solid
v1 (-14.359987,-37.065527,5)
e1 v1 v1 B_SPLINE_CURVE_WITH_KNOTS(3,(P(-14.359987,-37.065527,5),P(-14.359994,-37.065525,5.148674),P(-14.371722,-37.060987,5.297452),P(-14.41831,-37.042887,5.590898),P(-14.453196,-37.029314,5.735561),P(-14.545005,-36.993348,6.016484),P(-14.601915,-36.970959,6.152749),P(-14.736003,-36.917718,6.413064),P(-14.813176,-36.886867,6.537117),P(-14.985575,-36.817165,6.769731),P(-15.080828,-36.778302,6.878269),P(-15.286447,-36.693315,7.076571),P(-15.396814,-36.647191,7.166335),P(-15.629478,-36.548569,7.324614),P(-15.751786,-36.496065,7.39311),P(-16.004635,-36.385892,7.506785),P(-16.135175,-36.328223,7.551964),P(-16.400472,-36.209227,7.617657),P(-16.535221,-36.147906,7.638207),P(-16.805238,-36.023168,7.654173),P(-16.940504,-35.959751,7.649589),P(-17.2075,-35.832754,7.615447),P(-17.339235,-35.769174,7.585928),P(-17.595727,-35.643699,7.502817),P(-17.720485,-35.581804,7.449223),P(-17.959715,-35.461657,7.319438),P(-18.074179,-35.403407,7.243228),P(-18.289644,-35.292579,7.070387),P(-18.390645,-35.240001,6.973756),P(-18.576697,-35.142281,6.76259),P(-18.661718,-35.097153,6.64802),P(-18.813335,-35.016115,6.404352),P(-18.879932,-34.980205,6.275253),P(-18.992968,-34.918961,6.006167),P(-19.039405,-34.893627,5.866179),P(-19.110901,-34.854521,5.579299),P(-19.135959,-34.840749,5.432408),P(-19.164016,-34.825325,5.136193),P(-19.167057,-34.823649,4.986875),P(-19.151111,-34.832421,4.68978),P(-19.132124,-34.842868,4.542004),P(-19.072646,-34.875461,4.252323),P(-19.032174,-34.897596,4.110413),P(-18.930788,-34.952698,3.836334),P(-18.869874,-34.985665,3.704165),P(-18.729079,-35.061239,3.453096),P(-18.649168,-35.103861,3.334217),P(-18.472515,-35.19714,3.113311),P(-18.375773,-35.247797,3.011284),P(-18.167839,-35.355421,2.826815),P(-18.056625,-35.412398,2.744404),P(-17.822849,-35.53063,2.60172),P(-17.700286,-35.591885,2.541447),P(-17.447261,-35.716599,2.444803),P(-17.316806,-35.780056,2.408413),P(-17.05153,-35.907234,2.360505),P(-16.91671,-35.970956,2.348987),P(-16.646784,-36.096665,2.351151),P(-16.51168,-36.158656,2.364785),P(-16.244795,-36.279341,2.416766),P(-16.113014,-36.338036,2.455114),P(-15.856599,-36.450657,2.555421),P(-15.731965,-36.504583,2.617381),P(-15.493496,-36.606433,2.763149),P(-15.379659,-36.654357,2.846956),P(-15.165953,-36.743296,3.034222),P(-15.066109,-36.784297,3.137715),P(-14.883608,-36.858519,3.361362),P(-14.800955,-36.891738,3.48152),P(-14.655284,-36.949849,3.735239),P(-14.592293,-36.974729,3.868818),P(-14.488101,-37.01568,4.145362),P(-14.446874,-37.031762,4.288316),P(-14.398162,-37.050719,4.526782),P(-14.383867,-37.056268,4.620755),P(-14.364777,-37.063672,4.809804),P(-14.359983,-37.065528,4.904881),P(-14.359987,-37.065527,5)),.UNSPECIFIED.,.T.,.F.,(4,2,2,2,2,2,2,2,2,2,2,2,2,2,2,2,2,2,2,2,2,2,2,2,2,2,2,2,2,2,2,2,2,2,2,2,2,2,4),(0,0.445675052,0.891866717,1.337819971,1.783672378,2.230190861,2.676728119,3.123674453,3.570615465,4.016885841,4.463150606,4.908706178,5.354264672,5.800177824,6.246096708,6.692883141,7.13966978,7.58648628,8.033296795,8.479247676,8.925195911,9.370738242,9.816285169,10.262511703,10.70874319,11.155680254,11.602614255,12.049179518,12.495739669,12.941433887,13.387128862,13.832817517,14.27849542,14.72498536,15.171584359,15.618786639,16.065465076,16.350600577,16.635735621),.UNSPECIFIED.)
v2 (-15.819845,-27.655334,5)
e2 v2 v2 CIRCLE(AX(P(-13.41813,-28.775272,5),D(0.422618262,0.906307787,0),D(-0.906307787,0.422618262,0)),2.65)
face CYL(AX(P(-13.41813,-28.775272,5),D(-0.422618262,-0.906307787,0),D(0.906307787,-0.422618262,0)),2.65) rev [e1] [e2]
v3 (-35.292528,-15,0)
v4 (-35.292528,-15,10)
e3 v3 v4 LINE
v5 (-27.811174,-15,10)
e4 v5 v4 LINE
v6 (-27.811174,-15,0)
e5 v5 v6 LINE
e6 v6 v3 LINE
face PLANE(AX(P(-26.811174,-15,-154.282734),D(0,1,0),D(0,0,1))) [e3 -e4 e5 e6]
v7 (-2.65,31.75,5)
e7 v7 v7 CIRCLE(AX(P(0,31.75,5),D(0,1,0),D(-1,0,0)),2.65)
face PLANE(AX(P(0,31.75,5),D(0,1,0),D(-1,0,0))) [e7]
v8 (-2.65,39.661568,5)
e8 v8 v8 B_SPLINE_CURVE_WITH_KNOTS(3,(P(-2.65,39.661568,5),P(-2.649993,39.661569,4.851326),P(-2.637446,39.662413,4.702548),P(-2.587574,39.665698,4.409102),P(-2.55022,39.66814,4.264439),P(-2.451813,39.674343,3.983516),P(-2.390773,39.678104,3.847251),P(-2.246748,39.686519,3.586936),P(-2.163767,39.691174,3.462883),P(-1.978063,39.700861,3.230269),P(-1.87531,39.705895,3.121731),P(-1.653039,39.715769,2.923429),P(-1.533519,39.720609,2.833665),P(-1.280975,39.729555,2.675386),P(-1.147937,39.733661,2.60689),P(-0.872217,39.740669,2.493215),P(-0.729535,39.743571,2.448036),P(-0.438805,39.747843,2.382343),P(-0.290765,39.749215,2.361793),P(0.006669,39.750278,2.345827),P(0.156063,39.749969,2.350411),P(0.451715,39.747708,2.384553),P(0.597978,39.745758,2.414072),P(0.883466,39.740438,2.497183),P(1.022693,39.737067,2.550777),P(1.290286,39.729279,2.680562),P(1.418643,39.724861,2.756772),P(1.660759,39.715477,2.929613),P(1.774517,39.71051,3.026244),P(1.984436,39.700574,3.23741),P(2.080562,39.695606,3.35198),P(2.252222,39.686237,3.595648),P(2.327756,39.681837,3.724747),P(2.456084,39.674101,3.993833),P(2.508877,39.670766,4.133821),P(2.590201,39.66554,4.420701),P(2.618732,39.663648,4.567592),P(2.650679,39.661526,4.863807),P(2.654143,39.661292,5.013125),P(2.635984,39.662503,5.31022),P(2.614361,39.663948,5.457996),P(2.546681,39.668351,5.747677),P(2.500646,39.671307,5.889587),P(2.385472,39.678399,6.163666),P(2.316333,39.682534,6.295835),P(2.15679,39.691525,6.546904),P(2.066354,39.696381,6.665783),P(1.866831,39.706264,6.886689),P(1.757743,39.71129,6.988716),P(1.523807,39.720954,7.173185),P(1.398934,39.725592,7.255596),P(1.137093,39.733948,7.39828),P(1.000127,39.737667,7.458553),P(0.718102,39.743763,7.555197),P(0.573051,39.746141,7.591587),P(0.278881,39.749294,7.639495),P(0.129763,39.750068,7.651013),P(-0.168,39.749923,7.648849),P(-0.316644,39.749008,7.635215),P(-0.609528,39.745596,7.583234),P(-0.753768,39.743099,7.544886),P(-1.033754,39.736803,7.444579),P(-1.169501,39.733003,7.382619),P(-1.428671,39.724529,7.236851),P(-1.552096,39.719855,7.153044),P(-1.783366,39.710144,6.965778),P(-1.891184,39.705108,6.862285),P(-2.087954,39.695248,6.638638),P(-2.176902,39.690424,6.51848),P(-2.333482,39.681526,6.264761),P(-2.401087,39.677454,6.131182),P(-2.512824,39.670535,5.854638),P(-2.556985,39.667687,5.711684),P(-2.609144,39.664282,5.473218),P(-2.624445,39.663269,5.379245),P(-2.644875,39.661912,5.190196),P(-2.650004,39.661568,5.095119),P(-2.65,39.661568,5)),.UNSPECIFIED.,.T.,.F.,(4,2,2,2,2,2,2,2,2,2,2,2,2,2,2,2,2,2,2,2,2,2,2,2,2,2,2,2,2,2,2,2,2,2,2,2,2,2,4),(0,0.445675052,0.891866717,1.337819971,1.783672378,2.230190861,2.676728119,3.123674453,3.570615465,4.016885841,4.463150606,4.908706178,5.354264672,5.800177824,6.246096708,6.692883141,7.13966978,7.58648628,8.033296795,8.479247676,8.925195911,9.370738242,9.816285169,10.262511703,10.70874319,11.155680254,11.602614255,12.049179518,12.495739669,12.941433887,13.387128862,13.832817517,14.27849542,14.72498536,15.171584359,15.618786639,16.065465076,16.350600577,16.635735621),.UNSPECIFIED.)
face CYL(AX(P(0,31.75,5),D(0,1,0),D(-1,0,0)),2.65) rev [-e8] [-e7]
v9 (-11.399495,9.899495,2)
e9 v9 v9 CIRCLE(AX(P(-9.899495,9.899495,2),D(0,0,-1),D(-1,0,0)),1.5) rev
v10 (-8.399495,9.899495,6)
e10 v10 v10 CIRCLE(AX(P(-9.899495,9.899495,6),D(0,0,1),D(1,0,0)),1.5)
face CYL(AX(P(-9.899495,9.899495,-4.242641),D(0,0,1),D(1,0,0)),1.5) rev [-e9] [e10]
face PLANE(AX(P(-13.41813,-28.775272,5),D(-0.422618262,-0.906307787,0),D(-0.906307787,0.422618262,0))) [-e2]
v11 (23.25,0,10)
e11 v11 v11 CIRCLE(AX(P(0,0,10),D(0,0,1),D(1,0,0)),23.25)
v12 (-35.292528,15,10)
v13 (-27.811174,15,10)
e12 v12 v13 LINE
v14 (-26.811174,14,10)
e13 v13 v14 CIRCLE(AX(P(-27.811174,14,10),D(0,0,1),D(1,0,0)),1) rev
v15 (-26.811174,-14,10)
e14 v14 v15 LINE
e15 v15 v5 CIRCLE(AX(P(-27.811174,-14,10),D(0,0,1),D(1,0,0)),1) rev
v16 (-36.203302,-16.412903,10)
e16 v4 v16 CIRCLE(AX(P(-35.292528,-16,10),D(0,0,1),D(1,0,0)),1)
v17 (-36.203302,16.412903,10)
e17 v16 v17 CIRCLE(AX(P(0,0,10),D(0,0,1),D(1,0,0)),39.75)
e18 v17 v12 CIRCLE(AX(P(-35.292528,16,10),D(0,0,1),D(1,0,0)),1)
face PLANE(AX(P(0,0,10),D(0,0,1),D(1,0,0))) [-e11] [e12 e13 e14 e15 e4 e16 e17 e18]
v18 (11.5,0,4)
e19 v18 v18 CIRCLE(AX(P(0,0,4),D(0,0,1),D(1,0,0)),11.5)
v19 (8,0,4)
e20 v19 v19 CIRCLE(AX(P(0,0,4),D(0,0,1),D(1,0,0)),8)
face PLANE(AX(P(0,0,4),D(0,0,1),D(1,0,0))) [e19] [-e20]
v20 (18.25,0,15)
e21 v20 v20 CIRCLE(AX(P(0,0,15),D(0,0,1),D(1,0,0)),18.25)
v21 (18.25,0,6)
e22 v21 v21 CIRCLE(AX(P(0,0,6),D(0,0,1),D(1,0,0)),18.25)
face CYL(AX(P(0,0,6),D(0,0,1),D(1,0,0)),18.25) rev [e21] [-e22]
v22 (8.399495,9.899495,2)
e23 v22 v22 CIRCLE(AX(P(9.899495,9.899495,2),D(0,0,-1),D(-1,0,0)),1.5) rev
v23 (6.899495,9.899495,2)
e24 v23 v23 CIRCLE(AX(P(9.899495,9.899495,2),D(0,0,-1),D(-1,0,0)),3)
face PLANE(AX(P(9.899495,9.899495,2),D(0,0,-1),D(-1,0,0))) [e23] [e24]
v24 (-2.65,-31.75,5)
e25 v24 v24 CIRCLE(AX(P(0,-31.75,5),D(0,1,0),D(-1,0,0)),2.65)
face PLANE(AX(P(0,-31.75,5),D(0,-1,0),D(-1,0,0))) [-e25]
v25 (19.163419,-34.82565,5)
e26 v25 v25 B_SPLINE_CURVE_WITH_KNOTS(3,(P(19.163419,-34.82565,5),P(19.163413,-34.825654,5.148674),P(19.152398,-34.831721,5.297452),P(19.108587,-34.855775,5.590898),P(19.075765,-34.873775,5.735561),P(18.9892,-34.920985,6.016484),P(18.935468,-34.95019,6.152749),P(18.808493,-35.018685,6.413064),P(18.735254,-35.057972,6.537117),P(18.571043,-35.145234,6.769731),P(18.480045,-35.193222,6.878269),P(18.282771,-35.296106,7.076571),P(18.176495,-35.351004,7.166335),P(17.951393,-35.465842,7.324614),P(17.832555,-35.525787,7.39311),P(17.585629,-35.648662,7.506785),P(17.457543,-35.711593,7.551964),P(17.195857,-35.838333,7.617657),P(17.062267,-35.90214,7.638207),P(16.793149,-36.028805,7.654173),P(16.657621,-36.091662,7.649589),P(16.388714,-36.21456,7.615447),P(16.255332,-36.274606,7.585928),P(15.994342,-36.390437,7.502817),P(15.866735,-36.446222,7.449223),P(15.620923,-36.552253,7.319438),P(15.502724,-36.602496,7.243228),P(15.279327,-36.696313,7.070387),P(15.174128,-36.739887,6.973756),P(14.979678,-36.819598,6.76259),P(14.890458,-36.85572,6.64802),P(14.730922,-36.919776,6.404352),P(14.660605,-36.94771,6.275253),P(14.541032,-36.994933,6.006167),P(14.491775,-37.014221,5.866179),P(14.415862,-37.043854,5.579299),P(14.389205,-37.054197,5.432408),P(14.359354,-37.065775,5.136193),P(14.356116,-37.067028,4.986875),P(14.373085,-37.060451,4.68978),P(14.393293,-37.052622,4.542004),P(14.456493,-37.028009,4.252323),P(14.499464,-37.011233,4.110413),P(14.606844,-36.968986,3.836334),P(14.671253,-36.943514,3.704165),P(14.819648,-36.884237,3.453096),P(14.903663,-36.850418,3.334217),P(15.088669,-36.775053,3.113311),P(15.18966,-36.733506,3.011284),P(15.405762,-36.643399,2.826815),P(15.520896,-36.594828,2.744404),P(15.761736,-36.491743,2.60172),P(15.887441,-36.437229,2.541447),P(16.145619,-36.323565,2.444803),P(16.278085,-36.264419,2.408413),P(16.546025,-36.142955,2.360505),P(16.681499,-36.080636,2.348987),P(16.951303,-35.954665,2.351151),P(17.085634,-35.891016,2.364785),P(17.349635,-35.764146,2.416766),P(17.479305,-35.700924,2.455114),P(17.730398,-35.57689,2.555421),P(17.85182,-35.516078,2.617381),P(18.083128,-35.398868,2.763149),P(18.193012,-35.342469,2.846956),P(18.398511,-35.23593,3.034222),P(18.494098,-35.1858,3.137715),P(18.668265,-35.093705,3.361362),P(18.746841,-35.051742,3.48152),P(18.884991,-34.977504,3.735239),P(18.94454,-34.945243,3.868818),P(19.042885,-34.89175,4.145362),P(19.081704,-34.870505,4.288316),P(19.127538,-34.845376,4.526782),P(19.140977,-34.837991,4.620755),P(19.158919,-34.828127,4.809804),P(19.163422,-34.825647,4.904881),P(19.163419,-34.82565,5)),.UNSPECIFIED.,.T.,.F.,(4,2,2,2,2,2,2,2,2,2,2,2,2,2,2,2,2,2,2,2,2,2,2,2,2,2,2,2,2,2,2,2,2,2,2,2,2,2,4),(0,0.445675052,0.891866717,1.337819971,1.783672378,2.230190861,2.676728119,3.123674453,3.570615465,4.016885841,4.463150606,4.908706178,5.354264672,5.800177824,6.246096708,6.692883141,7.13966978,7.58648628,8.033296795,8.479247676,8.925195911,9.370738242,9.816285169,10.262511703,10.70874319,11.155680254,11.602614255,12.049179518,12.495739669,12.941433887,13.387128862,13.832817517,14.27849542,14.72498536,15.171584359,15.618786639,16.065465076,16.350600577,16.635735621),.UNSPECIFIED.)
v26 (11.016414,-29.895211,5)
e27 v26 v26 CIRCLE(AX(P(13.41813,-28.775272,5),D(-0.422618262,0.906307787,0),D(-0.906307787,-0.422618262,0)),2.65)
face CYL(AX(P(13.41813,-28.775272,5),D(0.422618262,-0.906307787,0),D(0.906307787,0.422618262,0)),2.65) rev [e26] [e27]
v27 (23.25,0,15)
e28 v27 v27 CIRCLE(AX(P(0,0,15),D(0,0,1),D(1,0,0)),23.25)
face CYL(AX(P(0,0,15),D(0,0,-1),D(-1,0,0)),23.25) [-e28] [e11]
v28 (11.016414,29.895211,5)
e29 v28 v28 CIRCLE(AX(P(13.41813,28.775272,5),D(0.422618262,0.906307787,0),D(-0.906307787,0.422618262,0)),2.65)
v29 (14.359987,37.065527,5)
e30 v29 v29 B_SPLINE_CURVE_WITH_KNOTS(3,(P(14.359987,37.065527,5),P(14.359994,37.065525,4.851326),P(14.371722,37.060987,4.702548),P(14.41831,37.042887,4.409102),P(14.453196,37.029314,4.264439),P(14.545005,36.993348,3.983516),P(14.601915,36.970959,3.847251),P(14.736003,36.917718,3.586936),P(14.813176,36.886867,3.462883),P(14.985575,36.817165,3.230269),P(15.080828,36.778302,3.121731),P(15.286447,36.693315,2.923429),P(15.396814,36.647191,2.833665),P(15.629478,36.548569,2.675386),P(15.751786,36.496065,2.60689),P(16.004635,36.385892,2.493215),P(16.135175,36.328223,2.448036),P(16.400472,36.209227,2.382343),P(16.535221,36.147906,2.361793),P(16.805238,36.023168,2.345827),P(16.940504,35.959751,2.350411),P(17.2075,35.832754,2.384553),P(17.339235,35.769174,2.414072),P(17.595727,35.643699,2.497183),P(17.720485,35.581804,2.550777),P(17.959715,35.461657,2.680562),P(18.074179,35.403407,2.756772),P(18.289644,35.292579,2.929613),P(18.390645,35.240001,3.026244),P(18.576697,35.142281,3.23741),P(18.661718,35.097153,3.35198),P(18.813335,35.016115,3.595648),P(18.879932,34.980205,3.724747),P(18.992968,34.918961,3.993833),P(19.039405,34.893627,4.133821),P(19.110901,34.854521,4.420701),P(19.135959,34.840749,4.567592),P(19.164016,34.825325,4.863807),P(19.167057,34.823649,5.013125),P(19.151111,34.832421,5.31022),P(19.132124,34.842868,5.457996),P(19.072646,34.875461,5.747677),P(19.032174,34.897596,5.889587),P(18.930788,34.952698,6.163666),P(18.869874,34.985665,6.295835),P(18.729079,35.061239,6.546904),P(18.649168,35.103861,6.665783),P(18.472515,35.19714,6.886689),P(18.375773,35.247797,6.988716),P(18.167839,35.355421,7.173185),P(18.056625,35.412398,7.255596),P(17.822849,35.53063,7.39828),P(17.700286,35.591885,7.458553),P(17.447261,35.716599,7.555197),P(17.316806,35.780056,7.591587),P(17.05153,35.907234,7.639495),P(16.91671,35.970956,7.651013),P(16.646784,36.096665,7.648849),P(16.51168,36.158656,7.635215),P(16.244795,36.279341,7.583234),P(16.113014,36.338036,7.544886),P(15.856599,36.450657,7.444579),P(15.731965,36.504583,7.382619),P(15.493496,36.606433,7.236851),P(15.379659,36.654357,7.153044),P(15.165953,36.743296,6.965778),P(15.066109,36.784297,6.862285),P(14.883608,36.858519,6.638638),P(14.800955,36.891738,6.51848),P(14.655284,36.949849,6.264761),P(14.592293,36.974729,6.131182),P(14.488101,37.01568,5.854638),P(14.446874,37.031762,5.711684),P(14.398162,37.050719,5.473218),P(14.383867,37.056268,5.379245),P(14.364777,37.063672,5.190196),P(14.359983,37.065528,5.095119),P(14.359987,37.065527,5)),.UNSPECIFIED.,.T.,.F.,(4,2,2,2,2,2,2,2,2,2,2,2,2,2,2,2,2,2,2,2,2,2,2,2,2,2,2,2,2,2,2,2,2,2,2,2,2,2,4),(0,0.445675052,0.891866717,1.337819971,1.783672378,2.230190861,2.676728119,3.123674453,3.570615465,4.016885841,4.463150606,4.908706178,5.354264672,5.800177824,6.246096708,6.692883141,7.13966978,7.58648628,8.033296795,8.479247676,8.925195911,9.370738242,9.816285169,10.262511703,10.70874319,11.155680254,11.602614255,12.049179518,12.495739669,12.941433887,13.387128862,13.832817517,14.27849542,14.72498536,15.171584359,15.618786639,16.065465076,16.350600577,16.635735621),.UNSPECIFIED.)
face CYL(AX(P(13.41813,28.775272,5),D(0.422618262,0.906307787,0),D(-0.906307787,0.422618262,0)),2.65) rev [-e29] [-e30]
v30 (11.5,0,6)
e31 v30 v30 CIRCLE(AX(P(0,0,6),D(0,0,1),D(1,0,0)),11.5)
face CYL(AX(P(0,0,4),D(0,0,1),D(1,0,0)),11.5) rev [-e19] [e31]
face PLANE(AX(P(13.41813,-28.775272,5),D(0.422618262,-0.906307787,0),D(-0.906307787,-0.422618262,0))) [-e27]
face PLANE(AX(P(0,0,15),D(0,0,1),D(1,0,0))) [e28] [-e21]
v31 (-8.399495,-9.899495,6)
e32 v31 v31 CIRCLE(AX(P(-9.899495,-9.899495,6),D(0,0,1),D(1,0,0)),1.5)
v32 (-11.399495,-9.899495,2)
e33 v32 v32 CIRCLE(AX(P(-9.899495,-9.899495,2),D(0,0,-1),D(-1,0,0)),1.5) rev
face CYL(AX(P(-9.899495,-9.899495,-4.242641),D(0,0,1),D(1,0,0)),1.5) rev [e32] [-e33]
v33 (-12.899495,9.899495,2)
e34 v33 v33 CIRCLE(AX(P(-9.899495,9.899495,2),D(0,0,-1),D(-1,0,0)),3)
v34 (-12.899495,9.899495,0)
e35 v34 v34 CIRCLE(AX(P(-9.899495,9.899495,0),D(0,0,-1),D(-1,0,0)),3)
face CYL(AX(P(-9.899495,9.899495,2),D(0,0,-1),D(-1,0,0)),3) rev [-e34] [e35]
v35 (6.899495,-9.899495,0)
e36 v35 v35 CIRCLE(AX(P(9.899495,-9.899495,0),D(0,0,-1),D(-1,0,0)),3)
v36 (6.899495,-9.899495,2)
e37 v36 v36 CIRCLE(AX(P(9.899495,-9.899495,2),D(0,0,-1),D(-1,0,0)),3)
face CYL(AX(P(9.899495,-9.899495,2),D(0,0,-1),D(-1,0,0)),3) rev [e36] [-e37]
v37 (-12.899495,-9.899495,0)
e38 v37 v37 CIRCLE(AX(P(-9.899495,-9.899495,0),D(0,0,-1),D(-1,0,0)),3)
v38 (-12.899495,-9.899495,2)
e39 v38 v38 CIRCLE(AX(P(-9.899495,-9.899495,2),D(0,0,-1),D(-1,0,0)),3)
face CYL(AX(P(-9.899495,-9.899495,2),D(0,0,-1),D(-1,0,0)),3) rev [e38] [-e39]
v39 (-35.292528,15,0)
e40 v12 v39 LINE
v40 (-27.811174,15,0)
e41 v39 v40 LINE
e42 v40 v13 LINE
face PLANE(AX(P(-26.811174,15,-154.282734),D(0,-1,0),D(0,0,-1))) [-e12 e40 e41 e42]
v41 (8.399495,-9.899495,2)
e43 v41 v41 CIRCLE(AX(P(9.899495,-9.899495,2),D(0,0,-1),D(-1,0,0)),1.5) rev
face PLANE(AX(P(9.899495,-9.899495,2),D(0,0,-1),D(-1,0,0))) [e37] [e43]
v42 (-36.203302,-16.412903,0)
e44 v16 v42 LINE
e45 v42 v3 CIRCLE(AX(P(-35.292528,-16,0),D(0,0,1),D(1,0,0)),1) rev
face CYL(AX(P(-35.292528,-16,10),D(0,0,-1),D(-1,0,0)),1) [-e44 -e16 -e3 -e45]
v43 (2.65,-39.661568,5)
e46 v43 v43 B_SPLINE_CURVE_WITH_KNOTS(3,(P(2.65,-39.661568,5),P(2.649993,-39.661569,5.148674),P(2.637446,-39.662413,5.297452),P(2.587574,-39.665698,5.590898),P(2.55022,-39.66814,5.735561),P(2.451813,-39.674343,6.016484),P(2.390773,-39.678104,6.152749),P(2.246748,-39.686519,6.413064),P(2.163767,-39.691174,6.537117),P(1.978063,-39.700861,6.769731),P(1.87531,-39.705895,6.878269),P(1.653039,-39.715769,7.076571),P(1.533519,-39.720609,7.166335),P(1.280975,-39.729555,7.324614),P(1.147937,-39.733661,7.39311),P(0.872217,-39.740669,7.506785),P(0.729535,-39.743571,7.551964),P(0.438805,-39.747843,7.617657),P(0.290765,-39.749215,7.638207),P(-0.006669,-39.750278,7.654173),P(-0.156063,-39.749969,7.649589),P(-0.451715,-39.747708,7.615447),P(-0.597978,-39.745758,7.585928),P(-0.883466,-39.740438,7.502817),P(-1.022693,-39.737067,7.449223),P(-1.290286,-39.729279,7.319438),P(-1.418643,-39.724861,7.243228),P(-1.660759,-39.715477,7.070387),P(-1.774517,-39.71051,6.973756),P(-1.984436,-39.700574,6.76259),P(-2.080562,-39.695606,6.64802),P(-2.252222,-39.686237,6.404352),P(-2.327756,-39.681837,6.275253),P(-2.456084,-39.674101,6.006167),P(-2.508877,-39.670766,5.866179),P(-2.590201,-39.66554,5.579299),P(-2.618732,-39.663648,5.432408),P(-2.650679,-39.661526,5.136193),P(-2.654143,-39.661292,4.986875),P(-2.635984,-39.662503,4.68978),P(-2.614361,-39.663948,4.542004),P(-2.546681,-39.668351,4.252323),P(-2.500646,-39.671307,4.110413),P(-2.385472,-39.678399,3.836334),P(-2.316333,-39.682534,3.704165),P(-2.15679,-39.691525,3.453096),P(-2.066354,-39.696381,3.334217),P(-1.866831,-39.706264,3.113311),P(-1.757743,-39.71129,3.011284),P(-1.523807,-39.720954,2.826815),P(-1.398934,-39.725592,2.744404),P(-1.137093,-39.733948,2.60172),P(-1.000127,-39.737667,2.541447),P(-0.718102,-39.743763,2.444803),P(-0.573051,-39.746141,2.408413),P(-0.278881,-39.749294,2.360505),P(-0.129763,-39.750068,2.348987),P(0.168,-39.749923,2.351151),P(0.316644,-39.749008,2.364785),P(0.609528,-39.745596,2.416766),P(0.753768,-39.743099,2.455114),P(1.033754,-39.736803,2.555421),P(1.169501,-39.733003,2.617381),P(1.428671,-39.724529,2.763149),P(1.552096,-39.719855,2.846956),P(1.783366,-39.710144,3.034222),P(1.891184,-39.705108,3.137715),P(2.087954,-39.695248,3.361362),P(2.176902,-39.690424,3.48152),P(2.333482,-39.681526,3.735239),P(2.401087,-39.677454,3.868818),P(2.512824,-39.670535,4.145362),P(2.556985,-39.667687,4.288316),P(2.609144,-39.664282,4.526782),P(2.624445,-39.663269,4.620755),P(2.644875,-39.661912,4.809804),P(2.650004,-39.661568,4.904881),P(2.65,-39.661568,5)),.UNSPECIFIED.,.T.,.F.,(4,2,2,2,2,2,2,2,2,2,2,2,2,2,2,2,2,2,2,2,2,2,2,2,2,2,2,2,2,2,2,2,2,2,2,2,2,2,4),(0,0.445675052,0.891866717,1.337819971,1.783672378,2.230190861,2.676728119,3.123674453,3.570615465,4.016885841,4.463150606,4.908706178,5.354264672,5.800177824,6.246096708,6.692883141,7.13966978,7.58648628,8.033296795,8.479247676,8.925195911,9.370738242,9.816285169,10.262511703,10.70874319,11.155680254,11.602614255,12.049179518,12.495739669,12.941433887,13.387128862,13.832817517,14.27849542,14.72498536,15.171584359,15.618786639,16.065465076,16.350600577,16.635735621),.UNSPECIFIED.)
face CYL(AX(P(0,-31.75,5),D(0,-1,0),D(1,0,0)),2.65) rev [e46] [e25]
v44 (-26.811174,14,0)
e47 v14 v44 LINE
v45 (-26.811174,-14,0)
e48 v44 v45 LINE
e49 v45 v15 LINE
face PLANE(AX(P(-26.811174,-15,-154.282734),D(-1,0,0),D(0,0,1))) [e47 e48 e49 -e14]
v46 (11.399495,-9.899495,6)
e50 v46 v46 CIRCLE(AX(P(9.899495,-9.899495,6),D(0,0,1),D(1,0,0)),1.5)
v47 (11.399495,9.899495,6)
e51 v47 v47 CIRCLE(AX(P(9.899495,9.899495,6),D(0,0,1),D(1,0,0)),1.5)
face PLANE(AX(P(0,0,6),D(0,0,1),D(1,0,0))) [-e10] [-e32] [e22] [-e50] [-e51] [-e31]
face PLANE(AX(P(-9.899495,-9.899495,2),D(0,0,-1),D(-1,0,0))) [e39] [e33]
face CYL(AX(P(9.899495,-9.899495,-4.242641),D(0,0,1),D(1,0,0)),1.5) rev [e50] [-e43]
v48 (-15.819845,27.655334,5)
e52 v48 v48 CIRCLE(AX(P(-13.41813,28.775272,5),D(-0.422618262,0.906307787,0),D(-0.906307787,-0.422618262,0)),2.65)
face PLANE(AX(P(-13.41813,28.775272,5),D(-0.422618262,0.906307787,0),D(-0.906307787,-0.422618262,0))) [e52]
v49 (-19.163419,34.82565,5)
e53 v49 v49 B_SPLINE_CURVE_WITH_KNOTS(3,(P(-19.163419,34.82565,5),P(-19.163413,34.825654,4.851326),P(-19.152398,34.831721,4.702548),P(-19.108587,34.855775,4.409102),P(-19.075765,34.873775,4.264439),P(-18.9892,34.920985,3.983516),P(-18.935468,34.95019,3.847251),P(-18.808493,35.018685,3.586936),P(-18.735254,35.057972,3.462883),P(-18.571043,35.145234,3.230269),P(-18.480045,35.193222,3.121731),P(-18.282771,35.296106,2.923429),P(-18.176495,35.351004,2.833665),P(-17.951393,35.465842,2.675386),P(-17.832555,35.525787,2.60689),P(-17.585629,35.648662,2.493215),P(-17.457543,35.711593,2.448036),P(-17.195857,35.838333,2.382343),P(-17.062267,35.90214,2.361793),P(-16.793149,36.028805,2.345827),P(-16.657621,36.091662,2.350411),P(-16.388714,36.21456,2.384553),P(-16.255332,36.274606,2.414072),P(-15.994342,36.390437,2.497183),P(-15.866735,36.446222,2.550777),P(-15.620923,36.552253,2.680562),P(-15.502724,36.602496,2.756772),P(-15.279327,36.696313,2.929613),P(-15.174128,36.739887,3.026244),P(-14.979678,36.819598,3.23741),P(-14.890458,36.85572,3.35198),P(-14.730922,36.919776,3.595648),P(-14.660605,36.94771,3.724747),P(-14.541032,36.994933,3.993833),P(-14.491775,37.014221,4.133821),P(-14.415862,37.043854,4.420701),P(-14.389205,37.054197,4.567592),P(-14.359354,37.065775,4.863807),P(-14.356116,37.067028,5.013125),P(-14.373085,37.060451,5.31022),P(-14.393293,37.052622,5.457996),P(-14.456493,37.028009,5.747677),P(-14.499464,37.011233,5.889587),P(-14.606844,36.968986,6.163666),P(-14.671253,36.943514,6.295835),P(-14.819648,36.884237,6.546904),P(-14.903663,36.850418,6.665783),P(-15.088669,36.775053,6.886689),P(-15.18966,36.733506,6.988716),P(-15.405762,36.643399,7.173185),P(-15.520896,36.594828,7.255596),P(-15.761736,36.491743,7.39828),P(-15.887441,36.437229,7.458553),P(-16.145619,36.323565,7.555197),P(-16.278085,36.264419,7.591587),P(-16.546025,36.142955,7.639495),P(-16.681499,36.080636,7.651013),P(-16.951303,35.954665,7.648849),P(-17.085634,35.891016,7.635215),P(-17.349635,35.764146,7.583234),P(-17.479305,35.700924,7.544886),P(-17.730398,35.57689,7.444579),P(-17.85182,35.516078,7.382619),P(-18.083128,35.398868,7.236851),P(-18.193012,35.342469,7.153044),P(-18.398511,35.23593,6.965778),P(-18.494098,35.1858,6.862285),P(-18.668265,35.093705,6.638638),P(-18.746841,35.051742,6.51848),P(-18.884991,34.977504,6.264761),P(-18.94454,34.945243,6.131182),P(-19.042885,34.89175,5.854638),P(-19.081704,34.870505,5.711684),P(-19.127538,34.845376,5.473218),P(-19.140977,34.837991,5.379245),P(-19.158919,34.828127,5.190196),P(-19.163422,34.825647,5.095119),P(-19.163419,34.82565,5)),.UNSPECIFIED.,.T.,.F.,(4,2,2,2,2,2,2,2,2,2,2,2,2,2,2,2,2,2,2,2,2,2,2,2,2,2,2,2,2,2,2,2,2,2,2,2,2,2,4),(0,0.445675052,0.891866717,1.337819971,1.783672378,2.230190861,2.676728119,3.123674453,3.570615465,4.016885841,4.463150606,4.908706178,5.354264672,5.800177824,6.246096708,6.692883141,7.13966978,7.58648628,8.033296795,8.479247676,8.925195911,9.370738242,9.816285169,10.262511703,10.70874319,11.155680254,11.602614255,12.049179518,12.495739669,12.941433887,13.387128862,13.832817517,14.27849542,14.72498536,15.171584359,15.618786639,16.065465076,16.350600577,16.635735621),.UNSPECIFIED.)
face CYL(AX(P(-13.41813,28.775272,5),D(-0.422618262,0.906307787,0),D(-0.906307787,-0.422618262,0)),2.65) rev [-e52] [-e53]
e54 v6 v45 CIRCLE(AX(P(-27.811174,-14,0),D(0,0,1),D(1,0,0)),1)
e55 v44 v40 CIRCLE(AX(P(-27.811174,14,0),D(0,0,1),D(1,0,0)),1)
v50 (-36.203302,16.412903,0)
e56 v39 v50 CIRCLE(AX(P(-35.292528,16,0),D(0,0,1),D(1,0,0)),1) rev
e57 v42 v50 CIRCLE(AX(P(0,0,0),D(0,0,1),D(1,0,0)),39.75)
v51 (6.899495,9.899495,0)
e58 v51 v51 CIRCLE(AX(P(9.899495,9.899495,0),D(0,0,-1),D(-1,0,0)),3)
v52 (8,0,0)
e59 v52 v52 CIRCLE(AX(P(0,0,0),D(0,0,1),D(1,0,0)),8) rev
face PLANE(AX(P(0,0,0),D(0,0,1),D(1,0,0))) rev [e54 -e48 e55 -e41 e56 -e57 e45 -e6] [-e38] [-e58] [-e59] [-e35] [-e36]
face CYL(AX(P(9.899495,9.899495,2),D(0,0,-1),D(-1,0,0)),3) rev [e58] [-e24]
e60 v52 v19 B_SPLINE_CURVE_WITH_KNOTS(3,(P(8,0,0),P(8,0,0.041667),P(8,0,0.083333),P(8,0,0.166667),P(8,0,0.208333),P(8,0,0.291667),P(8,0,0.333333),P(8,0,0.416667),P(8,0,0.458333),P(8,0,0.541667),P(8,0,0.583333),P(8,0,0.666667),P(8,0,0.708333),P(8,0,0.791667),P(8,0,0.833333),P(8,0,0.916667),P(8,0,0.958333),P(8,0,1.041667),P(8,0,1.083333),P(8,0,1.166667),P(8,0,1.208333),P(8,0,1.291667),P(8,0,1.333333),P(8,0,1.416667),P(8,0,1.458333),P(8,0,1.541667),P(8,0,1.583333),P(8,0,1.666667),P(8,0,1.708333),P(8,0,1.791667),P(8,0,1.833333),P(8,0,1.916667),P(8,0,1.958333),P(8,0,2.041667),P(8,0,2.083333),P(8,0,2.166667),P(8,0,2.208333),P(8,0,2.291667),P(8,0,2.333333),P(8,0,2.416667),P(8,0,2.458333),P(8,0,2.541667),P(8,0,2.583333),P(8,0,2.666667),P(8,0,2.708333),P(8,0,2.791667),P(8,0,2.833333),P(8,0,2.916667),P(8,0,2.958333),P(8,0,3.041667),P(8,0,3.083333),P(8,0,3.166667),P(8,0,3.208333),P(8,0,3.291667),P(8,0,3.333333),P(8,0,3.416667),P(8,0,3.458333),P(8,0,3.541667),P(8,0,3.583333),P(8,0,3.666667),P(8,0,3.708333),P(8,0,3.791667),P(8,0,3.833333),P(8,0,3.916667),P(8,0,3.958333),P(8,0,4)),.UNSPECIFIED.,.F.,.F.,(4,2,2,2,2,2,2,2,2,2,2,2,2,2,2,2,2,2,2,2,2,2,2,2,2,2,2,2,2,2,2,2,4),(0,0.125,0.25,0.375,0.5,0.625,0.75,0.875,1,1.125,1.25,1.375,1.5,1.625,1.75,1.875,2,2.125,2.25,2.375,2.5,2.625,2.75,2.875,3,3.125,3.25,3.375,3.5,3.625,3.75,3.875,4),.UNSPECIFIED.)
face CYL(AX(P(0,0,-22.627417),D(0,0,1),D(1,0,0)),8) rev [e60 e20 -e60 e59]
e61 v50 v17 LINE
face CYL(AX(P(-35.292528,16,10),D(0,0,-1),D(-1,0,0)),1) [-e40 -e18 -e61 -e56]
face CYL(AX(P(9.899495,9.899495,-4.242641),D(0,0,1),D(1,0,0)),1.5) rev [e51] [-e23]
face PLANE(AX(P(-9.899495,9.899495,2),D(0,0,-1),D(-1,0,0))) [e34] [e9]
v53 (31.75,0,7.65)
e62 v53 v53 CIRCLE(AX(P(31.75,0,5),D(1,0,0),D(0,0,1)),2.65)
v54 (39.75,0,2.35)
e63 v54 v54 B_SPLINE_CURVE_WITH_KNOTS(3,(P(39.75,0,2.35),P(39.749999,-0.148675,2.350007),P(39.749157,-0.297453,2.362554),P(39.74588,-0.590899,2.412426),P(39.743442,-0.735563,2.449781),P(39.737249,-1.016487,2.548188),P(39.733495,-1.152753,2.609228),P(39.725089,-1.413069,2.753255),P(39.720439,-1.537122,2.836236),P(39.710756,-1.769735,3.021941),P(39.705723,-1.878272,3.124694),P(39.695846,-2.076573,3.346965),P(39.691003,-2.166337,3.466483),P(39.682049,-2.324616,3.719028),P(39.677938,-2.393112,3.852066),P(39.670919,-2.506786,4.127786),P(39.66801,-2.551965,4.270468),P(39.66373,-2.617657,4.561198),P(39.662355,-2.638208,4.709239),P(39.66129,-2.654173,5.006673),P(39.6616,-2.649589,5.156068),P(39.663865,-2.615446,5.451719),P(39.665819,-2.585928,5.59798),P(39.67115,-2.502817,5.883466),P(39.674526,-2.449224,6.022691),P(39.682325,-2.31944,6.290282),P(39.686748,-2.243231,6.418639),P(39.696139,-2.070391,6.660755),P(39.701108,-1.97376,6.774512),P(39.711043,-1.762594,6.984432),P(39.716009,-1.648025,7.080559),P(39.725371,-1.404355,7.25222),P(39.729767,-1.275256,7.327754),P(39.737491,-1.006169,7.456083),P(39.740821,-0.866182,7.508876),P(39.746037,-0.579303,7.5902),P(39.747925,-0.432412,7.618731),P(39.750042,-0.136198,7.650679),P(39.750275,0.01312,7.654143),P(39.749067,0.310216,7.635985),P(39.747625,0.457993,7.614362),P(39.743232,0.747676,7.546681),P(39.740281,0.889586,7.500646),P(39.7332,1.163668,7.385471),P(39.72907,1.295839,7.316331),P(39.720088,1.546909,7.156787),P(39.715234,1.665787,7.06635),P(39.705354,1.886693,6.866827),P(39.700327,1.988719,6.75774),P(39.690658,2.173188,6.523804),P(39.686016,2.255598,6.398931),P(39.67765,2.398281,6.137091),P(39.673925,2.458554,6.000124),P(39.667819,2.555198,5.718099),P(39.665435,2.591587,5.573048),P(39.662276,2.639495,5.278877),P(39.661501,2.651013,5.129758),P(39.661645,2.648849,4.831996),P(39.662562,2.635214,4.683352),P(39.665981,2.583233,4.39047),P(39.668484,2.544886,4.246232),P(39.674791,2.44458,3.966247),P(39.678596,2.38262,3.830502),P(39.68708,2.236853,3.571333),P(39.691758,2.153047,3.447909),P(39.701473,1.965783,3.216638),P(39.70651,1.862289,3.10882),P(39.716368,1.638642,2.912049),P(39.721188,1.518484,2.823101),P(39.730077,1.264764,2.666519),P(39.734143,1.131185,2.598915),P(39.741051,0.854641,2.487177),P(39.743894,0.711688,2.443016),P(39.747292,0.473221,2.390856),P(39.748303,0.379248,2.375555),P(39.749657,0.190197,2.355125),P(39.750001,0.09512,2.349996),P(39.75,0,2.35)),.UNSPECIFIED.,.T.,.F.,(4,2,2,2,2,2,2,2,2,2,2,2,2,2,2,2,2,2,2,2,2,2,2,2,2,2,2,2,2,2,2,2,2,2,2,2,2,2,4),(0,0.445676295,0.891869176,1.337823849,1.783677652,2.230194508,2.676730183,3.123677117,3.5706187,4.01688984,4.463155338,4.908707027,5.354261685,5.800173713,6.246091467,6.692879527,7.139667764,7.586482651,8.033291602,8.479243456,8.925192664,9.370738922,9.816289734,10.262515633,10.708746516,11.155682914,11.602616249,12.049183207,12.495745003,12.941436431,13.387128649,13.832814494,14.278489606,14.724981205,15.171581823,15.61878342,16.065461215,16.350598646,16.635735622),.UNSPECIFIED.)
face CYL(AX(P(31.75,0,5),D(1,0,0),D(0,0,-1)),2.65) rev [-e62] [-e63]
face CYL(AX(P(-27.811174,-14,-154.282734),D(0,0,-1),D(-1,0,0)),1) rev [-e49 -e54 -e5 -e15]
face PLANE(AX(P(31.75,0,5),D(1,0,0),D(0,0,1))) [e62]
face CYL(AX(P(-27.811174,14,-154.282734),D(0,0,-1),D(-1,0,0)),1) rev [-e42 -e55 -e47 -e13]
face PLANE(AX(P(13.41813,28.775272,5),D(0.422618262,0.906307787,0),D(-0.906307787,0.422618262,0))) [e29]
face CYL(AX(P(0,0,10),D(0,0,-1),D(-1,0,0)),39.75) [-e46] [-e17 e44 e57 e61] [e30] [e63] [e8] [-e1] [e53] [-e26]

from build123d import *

# Parameters (mm, degrees)
SKETCH_1_R               = 39.75
EXTRUDE_1_DEPTH          = 10
SKETCH_2_R               = 18.25
CUT_EXTRUDE_1_DEPTH      = 4
SKETCH_3_R               = 11.5
CUT_EXTRUDE_2_DEPTH      = 2
SKETCH_4_R               = 1.5
CUT_EXTRUDE_3_DEPTH      = 6
SKETCH_5_R               = 3
CUT_EXTRUDE_4_DEPTH      = 2
SKETCH_7_R               = 2.65
CUT_EXTRUDE_5_DEPTH      = 8
PATTERN_CIRCULAR_1_COUNT = 2
PATTERN_CIRCULAR_1_ANGLE = 25
F_1_THE_OTHER_WAY_COUNT  = 2
F_1_THE_OTHER_WAY_ANGLE  = 25
MIRROR_1_COPY_1_SKETCH_R = 2.65
MIRROR_1_COPY_1_DEPTH    = 8
MIRROR_1_COPY_2_SKETCH_R = 2.65
MIRROR_1_COPY_2_DEPTH    = 8
SKETCH_8_R               = 8
CUT_EXTRUDE_6_DEPTH      = 4
SKETCH_9_R               = 2.65
CUT_EXTRUDE_7_DEPTH      = 8
PATTERN_CIRCULAR_2_COUNT = 2
EXTRUDE_START            = 5
SKETCH_10_R              = 23.25
SKETCH_10_R_2            = 18.25
EXTRUDE_2_DEPTH          = 5
CUT_EXTRUDE_START        = -10
CUT_EXTRUDE_8_DEPTH      = 10
FILLET_1_R               = 1


# Read off the part's stored shape, not the designer's step: Вырез-Вытянуть8
with BuildPart() as part:
    # Эскиз1 → Бобышка-Вытянуть1 (new body)
    with BuildSketch(Plane.XY):
        Circle(SKETCH_1_R)
    extrude(amount=EXTRUDE_1_DEPTH)

    # Эскиз2 → Вырез-Вытянуть1 (cut)
    with BuildSketch(Plane.XY.offset(10)):
        Circle(SKETCH_2_R)
    extrude(amount=-CUT_EXTRUDE_1_DEPTH, mode=Mode.SUBTRACT)

    # Эскиз3 → Вырез-Вытянуть2 (cut)
    with BuildSketch(Plane.XY.offset(6)):
        Circle(SKETCH_3_R)
    extrude(amount=-CUT_EXTRUDE_2_DEPTH, mode=Mode.SUBTRACT)

    # Эскиз4 → Вырез-Вытянуть3 (cut)
    with BuildSketch(Plane.XY.offset(6)):
        with Locations((-9.899494937, 9.899494937)):
            Circle(SKETCH_4_R)
        with Locations((9.899494937, 9.899494937)):
            Circle(SKETCH_4_R)
        with Locations((9.899494937, -9.899494937)):
            Circle(SKETCH_4_R)
        with Locations((-9.899494937, -9.899494937)):
            Circle(SKETCH_4_R)
    extrude(amount=-CUT_EXTRUDE_3_DEPTH, mode=Mode.SUBTRACT)

    # Эскиз5 → Вырез-Вытянуть4 (cut)
    with BuildSketch(Plane(origin=(0, 0, 0), x_dir=(-1, 0, 0), z_dir=(0, 0, -1))):
        with Locations((-9.899494937, 9.899494937)):
            Circle(SKETCH_5_R)
        with Locations((9.899494937, 9.899494937)):
            Circle(SKETCH_5_R)
        with Locations((9.899494937, -9.899494937)):
            Circle(SKETCH_5_R)
        with Locations((-9.899494937, -9.899494937)):
            Circle(SKETCH_5_R)
    extrude(amount=-CUT_EXTRUDE_4_DEPTH, mode=Mode.SUBTRACT)

    # Эскиз7 → Вырез-Вытянуть5 (cut)
    with BuildSketch(Plane(origin=(0, 39.75, 0), x_dir=(0, 0, -1), z_dir=(0, 1, 0))):
        with Locations(Location((-5, 0, 0), (0, 0, 90))):
            Circle(SKETCH_7_R)
    cut_extrude_5 = extrude(amount=-CUT_EXTRUDE_5_DEPTH, mode=Mode.SUBTRACT)

    # Круговой массив1: Вырез-Вытянуть5 ×2 about axis
    pattern_circular_1_axis = Axis((0, 0, 10), (0, 0, -1))
    for i in range(1, PATTERN_CIRCULAR_1_COUNT):
        add(cut_extrude_5.rotate(pattern_circular_1_axis, i * PATTERN_CIRCULAR_1_ANGLE / (PATTERN_CIRCULAR_1_COUNT - 1)), mode=Mode.SUBTRACT)

    # 1 the other way: Вырез-Вытянуть5 ×2 about axis
    f_1_the_other_way_axis = Axis((0, 0, 10), (0, 0, 1))
    for i in range(1, F_1_THE_OTHER_WAY_COUNT):
        add(cut_extrude_5.rotate(f_1_the_other_way_axis, i * F_1_THE_OTHER_WAY_ANGLE / (F_1_THE_OTHER_WAY_COUNT - 1)), mode=Mode.SUBTRACT)

    # Зеркальное отражение1: Вырез-Вытянуть5 across plane
    add(cut_extrude_5.mirror(Plane.ZX), mode=Mode.SUBTRACT)

    # Зеркальное отражение1 copy 1 sketch → Зеркальное отражение1 copy 1 (cut)
    with BuildSketch(Plane(origin=(16.799075904, -36.025734535, 0), x_dir=(0, 0, -1), z_dir=(0.4226182617407035, -0.906307787036648, 0))):
        with Locations((-5, 0)):
            Circle(MIRROR_1_COPY_1_SKETCH_R)
    extrude(amount=-MIRROR_1_COPY_1_DEPTH, mode=Mode.SUBTRACT)

    # Зеркальное отражение1 copy 2 sketch → Зеркальное отражение1 copy 2 (cut)
    with BuildSketch(Plane(origin=(-16.799075904, -36.025734535, 0), x_dir=(0, 0, -1), z_dir=(-0.42261826174069717, -0.9063077870366509, 0))):
        with Locations((-5, 0)):
            Circle(MIRROR_1_COPY_2_SKETCH_R)
    extrude(amount=-MIRROR_1_COPY_2_DEPTH, mode=Mode.SUBTRACT)

    # Эскиз8 → Вырез-Вытянуть6 (cut)
    with BuildSketch(Plane.XY.offset(4)):
        Circle(SKETCH_8_R)
    extrude(amount=-CUT_EXTRUDE_6_DEPTH, mode=Mode.SUBTRACT)

    # Эскиз9 → Вырез-Вытянуть7 (cut)
    with BuildSketch(Plane.ZY.offset(39.75)):
        with Locations((5, 0)):
            Circle(SKETCH_9_R)
    cut_extrude_7 = extrude(amount=-CUT_EXTRUDE_7_DEPTH, mode=Mode.SUBTRACT)

    # Круговой массив2: Вырез-Вытянуть7 ×2 about axis
    pattern_circular_2_axis = Axis((0, 0, 10), (0, 0, -1))
    for i in range(1, PATTERN_CIRCULAR_2_COUNT):
        add(cut_extrude_7.rotate(pattern_circular_2_axis, i * 360 / PATTERN_CIRCULAR_2_COUNT), mode=Mode.SUBTRACT)

    # Эскиз10 → Бобышка-Вытянуть2 (add)
    with BuildSketch(Plane.XY.offset(10).offset(EXTRUDE_START)):
        Circle(SKETCH_10_R)
        Circle(SKETCH_10_R_2, mode=Mode.SUBTRACT)
    extrude(amount=-EXTRUDE_2_DEPTH)

    # Вырез-Вытянуть8 outline → Вырез-Вытянуть8 (cut)
    with BuildSketch(Plane(origin=(0, 0, 0), x_dir=(-1, 0, 0), z_dir=(0, 0, -1)).offset(CUT_EXTRUDE_START)):
        with BuildLine():
            Line((36.811173575, 15), (26.811173575, 15))
            Line((26.811173575, 15), (26.811173575, -15))
            Line((26.811173575, -15), (36.811173575, -15))
            ThreePointArc((36.811173575, -15), (39.75, 0), (36.811173575, 15))
        make_face()
    extrude(amount=CUT_EXTRUDE_8_DEPTH, mode=Mode.SUBTRACT)

    # Скругление1
    fillet_1_edges = [part.edges().sort_by_distance(p)[0] for p in [
        (-26.811173575, 15, 5),
        (-26.811173575, -15, 5),
        (-36.811173575, -15, 5),
        (-36.811173575, 15, 5),
    ]]
    fillet(fillet_1_edges, radius=FILLET_1_R)


solid = part.part
